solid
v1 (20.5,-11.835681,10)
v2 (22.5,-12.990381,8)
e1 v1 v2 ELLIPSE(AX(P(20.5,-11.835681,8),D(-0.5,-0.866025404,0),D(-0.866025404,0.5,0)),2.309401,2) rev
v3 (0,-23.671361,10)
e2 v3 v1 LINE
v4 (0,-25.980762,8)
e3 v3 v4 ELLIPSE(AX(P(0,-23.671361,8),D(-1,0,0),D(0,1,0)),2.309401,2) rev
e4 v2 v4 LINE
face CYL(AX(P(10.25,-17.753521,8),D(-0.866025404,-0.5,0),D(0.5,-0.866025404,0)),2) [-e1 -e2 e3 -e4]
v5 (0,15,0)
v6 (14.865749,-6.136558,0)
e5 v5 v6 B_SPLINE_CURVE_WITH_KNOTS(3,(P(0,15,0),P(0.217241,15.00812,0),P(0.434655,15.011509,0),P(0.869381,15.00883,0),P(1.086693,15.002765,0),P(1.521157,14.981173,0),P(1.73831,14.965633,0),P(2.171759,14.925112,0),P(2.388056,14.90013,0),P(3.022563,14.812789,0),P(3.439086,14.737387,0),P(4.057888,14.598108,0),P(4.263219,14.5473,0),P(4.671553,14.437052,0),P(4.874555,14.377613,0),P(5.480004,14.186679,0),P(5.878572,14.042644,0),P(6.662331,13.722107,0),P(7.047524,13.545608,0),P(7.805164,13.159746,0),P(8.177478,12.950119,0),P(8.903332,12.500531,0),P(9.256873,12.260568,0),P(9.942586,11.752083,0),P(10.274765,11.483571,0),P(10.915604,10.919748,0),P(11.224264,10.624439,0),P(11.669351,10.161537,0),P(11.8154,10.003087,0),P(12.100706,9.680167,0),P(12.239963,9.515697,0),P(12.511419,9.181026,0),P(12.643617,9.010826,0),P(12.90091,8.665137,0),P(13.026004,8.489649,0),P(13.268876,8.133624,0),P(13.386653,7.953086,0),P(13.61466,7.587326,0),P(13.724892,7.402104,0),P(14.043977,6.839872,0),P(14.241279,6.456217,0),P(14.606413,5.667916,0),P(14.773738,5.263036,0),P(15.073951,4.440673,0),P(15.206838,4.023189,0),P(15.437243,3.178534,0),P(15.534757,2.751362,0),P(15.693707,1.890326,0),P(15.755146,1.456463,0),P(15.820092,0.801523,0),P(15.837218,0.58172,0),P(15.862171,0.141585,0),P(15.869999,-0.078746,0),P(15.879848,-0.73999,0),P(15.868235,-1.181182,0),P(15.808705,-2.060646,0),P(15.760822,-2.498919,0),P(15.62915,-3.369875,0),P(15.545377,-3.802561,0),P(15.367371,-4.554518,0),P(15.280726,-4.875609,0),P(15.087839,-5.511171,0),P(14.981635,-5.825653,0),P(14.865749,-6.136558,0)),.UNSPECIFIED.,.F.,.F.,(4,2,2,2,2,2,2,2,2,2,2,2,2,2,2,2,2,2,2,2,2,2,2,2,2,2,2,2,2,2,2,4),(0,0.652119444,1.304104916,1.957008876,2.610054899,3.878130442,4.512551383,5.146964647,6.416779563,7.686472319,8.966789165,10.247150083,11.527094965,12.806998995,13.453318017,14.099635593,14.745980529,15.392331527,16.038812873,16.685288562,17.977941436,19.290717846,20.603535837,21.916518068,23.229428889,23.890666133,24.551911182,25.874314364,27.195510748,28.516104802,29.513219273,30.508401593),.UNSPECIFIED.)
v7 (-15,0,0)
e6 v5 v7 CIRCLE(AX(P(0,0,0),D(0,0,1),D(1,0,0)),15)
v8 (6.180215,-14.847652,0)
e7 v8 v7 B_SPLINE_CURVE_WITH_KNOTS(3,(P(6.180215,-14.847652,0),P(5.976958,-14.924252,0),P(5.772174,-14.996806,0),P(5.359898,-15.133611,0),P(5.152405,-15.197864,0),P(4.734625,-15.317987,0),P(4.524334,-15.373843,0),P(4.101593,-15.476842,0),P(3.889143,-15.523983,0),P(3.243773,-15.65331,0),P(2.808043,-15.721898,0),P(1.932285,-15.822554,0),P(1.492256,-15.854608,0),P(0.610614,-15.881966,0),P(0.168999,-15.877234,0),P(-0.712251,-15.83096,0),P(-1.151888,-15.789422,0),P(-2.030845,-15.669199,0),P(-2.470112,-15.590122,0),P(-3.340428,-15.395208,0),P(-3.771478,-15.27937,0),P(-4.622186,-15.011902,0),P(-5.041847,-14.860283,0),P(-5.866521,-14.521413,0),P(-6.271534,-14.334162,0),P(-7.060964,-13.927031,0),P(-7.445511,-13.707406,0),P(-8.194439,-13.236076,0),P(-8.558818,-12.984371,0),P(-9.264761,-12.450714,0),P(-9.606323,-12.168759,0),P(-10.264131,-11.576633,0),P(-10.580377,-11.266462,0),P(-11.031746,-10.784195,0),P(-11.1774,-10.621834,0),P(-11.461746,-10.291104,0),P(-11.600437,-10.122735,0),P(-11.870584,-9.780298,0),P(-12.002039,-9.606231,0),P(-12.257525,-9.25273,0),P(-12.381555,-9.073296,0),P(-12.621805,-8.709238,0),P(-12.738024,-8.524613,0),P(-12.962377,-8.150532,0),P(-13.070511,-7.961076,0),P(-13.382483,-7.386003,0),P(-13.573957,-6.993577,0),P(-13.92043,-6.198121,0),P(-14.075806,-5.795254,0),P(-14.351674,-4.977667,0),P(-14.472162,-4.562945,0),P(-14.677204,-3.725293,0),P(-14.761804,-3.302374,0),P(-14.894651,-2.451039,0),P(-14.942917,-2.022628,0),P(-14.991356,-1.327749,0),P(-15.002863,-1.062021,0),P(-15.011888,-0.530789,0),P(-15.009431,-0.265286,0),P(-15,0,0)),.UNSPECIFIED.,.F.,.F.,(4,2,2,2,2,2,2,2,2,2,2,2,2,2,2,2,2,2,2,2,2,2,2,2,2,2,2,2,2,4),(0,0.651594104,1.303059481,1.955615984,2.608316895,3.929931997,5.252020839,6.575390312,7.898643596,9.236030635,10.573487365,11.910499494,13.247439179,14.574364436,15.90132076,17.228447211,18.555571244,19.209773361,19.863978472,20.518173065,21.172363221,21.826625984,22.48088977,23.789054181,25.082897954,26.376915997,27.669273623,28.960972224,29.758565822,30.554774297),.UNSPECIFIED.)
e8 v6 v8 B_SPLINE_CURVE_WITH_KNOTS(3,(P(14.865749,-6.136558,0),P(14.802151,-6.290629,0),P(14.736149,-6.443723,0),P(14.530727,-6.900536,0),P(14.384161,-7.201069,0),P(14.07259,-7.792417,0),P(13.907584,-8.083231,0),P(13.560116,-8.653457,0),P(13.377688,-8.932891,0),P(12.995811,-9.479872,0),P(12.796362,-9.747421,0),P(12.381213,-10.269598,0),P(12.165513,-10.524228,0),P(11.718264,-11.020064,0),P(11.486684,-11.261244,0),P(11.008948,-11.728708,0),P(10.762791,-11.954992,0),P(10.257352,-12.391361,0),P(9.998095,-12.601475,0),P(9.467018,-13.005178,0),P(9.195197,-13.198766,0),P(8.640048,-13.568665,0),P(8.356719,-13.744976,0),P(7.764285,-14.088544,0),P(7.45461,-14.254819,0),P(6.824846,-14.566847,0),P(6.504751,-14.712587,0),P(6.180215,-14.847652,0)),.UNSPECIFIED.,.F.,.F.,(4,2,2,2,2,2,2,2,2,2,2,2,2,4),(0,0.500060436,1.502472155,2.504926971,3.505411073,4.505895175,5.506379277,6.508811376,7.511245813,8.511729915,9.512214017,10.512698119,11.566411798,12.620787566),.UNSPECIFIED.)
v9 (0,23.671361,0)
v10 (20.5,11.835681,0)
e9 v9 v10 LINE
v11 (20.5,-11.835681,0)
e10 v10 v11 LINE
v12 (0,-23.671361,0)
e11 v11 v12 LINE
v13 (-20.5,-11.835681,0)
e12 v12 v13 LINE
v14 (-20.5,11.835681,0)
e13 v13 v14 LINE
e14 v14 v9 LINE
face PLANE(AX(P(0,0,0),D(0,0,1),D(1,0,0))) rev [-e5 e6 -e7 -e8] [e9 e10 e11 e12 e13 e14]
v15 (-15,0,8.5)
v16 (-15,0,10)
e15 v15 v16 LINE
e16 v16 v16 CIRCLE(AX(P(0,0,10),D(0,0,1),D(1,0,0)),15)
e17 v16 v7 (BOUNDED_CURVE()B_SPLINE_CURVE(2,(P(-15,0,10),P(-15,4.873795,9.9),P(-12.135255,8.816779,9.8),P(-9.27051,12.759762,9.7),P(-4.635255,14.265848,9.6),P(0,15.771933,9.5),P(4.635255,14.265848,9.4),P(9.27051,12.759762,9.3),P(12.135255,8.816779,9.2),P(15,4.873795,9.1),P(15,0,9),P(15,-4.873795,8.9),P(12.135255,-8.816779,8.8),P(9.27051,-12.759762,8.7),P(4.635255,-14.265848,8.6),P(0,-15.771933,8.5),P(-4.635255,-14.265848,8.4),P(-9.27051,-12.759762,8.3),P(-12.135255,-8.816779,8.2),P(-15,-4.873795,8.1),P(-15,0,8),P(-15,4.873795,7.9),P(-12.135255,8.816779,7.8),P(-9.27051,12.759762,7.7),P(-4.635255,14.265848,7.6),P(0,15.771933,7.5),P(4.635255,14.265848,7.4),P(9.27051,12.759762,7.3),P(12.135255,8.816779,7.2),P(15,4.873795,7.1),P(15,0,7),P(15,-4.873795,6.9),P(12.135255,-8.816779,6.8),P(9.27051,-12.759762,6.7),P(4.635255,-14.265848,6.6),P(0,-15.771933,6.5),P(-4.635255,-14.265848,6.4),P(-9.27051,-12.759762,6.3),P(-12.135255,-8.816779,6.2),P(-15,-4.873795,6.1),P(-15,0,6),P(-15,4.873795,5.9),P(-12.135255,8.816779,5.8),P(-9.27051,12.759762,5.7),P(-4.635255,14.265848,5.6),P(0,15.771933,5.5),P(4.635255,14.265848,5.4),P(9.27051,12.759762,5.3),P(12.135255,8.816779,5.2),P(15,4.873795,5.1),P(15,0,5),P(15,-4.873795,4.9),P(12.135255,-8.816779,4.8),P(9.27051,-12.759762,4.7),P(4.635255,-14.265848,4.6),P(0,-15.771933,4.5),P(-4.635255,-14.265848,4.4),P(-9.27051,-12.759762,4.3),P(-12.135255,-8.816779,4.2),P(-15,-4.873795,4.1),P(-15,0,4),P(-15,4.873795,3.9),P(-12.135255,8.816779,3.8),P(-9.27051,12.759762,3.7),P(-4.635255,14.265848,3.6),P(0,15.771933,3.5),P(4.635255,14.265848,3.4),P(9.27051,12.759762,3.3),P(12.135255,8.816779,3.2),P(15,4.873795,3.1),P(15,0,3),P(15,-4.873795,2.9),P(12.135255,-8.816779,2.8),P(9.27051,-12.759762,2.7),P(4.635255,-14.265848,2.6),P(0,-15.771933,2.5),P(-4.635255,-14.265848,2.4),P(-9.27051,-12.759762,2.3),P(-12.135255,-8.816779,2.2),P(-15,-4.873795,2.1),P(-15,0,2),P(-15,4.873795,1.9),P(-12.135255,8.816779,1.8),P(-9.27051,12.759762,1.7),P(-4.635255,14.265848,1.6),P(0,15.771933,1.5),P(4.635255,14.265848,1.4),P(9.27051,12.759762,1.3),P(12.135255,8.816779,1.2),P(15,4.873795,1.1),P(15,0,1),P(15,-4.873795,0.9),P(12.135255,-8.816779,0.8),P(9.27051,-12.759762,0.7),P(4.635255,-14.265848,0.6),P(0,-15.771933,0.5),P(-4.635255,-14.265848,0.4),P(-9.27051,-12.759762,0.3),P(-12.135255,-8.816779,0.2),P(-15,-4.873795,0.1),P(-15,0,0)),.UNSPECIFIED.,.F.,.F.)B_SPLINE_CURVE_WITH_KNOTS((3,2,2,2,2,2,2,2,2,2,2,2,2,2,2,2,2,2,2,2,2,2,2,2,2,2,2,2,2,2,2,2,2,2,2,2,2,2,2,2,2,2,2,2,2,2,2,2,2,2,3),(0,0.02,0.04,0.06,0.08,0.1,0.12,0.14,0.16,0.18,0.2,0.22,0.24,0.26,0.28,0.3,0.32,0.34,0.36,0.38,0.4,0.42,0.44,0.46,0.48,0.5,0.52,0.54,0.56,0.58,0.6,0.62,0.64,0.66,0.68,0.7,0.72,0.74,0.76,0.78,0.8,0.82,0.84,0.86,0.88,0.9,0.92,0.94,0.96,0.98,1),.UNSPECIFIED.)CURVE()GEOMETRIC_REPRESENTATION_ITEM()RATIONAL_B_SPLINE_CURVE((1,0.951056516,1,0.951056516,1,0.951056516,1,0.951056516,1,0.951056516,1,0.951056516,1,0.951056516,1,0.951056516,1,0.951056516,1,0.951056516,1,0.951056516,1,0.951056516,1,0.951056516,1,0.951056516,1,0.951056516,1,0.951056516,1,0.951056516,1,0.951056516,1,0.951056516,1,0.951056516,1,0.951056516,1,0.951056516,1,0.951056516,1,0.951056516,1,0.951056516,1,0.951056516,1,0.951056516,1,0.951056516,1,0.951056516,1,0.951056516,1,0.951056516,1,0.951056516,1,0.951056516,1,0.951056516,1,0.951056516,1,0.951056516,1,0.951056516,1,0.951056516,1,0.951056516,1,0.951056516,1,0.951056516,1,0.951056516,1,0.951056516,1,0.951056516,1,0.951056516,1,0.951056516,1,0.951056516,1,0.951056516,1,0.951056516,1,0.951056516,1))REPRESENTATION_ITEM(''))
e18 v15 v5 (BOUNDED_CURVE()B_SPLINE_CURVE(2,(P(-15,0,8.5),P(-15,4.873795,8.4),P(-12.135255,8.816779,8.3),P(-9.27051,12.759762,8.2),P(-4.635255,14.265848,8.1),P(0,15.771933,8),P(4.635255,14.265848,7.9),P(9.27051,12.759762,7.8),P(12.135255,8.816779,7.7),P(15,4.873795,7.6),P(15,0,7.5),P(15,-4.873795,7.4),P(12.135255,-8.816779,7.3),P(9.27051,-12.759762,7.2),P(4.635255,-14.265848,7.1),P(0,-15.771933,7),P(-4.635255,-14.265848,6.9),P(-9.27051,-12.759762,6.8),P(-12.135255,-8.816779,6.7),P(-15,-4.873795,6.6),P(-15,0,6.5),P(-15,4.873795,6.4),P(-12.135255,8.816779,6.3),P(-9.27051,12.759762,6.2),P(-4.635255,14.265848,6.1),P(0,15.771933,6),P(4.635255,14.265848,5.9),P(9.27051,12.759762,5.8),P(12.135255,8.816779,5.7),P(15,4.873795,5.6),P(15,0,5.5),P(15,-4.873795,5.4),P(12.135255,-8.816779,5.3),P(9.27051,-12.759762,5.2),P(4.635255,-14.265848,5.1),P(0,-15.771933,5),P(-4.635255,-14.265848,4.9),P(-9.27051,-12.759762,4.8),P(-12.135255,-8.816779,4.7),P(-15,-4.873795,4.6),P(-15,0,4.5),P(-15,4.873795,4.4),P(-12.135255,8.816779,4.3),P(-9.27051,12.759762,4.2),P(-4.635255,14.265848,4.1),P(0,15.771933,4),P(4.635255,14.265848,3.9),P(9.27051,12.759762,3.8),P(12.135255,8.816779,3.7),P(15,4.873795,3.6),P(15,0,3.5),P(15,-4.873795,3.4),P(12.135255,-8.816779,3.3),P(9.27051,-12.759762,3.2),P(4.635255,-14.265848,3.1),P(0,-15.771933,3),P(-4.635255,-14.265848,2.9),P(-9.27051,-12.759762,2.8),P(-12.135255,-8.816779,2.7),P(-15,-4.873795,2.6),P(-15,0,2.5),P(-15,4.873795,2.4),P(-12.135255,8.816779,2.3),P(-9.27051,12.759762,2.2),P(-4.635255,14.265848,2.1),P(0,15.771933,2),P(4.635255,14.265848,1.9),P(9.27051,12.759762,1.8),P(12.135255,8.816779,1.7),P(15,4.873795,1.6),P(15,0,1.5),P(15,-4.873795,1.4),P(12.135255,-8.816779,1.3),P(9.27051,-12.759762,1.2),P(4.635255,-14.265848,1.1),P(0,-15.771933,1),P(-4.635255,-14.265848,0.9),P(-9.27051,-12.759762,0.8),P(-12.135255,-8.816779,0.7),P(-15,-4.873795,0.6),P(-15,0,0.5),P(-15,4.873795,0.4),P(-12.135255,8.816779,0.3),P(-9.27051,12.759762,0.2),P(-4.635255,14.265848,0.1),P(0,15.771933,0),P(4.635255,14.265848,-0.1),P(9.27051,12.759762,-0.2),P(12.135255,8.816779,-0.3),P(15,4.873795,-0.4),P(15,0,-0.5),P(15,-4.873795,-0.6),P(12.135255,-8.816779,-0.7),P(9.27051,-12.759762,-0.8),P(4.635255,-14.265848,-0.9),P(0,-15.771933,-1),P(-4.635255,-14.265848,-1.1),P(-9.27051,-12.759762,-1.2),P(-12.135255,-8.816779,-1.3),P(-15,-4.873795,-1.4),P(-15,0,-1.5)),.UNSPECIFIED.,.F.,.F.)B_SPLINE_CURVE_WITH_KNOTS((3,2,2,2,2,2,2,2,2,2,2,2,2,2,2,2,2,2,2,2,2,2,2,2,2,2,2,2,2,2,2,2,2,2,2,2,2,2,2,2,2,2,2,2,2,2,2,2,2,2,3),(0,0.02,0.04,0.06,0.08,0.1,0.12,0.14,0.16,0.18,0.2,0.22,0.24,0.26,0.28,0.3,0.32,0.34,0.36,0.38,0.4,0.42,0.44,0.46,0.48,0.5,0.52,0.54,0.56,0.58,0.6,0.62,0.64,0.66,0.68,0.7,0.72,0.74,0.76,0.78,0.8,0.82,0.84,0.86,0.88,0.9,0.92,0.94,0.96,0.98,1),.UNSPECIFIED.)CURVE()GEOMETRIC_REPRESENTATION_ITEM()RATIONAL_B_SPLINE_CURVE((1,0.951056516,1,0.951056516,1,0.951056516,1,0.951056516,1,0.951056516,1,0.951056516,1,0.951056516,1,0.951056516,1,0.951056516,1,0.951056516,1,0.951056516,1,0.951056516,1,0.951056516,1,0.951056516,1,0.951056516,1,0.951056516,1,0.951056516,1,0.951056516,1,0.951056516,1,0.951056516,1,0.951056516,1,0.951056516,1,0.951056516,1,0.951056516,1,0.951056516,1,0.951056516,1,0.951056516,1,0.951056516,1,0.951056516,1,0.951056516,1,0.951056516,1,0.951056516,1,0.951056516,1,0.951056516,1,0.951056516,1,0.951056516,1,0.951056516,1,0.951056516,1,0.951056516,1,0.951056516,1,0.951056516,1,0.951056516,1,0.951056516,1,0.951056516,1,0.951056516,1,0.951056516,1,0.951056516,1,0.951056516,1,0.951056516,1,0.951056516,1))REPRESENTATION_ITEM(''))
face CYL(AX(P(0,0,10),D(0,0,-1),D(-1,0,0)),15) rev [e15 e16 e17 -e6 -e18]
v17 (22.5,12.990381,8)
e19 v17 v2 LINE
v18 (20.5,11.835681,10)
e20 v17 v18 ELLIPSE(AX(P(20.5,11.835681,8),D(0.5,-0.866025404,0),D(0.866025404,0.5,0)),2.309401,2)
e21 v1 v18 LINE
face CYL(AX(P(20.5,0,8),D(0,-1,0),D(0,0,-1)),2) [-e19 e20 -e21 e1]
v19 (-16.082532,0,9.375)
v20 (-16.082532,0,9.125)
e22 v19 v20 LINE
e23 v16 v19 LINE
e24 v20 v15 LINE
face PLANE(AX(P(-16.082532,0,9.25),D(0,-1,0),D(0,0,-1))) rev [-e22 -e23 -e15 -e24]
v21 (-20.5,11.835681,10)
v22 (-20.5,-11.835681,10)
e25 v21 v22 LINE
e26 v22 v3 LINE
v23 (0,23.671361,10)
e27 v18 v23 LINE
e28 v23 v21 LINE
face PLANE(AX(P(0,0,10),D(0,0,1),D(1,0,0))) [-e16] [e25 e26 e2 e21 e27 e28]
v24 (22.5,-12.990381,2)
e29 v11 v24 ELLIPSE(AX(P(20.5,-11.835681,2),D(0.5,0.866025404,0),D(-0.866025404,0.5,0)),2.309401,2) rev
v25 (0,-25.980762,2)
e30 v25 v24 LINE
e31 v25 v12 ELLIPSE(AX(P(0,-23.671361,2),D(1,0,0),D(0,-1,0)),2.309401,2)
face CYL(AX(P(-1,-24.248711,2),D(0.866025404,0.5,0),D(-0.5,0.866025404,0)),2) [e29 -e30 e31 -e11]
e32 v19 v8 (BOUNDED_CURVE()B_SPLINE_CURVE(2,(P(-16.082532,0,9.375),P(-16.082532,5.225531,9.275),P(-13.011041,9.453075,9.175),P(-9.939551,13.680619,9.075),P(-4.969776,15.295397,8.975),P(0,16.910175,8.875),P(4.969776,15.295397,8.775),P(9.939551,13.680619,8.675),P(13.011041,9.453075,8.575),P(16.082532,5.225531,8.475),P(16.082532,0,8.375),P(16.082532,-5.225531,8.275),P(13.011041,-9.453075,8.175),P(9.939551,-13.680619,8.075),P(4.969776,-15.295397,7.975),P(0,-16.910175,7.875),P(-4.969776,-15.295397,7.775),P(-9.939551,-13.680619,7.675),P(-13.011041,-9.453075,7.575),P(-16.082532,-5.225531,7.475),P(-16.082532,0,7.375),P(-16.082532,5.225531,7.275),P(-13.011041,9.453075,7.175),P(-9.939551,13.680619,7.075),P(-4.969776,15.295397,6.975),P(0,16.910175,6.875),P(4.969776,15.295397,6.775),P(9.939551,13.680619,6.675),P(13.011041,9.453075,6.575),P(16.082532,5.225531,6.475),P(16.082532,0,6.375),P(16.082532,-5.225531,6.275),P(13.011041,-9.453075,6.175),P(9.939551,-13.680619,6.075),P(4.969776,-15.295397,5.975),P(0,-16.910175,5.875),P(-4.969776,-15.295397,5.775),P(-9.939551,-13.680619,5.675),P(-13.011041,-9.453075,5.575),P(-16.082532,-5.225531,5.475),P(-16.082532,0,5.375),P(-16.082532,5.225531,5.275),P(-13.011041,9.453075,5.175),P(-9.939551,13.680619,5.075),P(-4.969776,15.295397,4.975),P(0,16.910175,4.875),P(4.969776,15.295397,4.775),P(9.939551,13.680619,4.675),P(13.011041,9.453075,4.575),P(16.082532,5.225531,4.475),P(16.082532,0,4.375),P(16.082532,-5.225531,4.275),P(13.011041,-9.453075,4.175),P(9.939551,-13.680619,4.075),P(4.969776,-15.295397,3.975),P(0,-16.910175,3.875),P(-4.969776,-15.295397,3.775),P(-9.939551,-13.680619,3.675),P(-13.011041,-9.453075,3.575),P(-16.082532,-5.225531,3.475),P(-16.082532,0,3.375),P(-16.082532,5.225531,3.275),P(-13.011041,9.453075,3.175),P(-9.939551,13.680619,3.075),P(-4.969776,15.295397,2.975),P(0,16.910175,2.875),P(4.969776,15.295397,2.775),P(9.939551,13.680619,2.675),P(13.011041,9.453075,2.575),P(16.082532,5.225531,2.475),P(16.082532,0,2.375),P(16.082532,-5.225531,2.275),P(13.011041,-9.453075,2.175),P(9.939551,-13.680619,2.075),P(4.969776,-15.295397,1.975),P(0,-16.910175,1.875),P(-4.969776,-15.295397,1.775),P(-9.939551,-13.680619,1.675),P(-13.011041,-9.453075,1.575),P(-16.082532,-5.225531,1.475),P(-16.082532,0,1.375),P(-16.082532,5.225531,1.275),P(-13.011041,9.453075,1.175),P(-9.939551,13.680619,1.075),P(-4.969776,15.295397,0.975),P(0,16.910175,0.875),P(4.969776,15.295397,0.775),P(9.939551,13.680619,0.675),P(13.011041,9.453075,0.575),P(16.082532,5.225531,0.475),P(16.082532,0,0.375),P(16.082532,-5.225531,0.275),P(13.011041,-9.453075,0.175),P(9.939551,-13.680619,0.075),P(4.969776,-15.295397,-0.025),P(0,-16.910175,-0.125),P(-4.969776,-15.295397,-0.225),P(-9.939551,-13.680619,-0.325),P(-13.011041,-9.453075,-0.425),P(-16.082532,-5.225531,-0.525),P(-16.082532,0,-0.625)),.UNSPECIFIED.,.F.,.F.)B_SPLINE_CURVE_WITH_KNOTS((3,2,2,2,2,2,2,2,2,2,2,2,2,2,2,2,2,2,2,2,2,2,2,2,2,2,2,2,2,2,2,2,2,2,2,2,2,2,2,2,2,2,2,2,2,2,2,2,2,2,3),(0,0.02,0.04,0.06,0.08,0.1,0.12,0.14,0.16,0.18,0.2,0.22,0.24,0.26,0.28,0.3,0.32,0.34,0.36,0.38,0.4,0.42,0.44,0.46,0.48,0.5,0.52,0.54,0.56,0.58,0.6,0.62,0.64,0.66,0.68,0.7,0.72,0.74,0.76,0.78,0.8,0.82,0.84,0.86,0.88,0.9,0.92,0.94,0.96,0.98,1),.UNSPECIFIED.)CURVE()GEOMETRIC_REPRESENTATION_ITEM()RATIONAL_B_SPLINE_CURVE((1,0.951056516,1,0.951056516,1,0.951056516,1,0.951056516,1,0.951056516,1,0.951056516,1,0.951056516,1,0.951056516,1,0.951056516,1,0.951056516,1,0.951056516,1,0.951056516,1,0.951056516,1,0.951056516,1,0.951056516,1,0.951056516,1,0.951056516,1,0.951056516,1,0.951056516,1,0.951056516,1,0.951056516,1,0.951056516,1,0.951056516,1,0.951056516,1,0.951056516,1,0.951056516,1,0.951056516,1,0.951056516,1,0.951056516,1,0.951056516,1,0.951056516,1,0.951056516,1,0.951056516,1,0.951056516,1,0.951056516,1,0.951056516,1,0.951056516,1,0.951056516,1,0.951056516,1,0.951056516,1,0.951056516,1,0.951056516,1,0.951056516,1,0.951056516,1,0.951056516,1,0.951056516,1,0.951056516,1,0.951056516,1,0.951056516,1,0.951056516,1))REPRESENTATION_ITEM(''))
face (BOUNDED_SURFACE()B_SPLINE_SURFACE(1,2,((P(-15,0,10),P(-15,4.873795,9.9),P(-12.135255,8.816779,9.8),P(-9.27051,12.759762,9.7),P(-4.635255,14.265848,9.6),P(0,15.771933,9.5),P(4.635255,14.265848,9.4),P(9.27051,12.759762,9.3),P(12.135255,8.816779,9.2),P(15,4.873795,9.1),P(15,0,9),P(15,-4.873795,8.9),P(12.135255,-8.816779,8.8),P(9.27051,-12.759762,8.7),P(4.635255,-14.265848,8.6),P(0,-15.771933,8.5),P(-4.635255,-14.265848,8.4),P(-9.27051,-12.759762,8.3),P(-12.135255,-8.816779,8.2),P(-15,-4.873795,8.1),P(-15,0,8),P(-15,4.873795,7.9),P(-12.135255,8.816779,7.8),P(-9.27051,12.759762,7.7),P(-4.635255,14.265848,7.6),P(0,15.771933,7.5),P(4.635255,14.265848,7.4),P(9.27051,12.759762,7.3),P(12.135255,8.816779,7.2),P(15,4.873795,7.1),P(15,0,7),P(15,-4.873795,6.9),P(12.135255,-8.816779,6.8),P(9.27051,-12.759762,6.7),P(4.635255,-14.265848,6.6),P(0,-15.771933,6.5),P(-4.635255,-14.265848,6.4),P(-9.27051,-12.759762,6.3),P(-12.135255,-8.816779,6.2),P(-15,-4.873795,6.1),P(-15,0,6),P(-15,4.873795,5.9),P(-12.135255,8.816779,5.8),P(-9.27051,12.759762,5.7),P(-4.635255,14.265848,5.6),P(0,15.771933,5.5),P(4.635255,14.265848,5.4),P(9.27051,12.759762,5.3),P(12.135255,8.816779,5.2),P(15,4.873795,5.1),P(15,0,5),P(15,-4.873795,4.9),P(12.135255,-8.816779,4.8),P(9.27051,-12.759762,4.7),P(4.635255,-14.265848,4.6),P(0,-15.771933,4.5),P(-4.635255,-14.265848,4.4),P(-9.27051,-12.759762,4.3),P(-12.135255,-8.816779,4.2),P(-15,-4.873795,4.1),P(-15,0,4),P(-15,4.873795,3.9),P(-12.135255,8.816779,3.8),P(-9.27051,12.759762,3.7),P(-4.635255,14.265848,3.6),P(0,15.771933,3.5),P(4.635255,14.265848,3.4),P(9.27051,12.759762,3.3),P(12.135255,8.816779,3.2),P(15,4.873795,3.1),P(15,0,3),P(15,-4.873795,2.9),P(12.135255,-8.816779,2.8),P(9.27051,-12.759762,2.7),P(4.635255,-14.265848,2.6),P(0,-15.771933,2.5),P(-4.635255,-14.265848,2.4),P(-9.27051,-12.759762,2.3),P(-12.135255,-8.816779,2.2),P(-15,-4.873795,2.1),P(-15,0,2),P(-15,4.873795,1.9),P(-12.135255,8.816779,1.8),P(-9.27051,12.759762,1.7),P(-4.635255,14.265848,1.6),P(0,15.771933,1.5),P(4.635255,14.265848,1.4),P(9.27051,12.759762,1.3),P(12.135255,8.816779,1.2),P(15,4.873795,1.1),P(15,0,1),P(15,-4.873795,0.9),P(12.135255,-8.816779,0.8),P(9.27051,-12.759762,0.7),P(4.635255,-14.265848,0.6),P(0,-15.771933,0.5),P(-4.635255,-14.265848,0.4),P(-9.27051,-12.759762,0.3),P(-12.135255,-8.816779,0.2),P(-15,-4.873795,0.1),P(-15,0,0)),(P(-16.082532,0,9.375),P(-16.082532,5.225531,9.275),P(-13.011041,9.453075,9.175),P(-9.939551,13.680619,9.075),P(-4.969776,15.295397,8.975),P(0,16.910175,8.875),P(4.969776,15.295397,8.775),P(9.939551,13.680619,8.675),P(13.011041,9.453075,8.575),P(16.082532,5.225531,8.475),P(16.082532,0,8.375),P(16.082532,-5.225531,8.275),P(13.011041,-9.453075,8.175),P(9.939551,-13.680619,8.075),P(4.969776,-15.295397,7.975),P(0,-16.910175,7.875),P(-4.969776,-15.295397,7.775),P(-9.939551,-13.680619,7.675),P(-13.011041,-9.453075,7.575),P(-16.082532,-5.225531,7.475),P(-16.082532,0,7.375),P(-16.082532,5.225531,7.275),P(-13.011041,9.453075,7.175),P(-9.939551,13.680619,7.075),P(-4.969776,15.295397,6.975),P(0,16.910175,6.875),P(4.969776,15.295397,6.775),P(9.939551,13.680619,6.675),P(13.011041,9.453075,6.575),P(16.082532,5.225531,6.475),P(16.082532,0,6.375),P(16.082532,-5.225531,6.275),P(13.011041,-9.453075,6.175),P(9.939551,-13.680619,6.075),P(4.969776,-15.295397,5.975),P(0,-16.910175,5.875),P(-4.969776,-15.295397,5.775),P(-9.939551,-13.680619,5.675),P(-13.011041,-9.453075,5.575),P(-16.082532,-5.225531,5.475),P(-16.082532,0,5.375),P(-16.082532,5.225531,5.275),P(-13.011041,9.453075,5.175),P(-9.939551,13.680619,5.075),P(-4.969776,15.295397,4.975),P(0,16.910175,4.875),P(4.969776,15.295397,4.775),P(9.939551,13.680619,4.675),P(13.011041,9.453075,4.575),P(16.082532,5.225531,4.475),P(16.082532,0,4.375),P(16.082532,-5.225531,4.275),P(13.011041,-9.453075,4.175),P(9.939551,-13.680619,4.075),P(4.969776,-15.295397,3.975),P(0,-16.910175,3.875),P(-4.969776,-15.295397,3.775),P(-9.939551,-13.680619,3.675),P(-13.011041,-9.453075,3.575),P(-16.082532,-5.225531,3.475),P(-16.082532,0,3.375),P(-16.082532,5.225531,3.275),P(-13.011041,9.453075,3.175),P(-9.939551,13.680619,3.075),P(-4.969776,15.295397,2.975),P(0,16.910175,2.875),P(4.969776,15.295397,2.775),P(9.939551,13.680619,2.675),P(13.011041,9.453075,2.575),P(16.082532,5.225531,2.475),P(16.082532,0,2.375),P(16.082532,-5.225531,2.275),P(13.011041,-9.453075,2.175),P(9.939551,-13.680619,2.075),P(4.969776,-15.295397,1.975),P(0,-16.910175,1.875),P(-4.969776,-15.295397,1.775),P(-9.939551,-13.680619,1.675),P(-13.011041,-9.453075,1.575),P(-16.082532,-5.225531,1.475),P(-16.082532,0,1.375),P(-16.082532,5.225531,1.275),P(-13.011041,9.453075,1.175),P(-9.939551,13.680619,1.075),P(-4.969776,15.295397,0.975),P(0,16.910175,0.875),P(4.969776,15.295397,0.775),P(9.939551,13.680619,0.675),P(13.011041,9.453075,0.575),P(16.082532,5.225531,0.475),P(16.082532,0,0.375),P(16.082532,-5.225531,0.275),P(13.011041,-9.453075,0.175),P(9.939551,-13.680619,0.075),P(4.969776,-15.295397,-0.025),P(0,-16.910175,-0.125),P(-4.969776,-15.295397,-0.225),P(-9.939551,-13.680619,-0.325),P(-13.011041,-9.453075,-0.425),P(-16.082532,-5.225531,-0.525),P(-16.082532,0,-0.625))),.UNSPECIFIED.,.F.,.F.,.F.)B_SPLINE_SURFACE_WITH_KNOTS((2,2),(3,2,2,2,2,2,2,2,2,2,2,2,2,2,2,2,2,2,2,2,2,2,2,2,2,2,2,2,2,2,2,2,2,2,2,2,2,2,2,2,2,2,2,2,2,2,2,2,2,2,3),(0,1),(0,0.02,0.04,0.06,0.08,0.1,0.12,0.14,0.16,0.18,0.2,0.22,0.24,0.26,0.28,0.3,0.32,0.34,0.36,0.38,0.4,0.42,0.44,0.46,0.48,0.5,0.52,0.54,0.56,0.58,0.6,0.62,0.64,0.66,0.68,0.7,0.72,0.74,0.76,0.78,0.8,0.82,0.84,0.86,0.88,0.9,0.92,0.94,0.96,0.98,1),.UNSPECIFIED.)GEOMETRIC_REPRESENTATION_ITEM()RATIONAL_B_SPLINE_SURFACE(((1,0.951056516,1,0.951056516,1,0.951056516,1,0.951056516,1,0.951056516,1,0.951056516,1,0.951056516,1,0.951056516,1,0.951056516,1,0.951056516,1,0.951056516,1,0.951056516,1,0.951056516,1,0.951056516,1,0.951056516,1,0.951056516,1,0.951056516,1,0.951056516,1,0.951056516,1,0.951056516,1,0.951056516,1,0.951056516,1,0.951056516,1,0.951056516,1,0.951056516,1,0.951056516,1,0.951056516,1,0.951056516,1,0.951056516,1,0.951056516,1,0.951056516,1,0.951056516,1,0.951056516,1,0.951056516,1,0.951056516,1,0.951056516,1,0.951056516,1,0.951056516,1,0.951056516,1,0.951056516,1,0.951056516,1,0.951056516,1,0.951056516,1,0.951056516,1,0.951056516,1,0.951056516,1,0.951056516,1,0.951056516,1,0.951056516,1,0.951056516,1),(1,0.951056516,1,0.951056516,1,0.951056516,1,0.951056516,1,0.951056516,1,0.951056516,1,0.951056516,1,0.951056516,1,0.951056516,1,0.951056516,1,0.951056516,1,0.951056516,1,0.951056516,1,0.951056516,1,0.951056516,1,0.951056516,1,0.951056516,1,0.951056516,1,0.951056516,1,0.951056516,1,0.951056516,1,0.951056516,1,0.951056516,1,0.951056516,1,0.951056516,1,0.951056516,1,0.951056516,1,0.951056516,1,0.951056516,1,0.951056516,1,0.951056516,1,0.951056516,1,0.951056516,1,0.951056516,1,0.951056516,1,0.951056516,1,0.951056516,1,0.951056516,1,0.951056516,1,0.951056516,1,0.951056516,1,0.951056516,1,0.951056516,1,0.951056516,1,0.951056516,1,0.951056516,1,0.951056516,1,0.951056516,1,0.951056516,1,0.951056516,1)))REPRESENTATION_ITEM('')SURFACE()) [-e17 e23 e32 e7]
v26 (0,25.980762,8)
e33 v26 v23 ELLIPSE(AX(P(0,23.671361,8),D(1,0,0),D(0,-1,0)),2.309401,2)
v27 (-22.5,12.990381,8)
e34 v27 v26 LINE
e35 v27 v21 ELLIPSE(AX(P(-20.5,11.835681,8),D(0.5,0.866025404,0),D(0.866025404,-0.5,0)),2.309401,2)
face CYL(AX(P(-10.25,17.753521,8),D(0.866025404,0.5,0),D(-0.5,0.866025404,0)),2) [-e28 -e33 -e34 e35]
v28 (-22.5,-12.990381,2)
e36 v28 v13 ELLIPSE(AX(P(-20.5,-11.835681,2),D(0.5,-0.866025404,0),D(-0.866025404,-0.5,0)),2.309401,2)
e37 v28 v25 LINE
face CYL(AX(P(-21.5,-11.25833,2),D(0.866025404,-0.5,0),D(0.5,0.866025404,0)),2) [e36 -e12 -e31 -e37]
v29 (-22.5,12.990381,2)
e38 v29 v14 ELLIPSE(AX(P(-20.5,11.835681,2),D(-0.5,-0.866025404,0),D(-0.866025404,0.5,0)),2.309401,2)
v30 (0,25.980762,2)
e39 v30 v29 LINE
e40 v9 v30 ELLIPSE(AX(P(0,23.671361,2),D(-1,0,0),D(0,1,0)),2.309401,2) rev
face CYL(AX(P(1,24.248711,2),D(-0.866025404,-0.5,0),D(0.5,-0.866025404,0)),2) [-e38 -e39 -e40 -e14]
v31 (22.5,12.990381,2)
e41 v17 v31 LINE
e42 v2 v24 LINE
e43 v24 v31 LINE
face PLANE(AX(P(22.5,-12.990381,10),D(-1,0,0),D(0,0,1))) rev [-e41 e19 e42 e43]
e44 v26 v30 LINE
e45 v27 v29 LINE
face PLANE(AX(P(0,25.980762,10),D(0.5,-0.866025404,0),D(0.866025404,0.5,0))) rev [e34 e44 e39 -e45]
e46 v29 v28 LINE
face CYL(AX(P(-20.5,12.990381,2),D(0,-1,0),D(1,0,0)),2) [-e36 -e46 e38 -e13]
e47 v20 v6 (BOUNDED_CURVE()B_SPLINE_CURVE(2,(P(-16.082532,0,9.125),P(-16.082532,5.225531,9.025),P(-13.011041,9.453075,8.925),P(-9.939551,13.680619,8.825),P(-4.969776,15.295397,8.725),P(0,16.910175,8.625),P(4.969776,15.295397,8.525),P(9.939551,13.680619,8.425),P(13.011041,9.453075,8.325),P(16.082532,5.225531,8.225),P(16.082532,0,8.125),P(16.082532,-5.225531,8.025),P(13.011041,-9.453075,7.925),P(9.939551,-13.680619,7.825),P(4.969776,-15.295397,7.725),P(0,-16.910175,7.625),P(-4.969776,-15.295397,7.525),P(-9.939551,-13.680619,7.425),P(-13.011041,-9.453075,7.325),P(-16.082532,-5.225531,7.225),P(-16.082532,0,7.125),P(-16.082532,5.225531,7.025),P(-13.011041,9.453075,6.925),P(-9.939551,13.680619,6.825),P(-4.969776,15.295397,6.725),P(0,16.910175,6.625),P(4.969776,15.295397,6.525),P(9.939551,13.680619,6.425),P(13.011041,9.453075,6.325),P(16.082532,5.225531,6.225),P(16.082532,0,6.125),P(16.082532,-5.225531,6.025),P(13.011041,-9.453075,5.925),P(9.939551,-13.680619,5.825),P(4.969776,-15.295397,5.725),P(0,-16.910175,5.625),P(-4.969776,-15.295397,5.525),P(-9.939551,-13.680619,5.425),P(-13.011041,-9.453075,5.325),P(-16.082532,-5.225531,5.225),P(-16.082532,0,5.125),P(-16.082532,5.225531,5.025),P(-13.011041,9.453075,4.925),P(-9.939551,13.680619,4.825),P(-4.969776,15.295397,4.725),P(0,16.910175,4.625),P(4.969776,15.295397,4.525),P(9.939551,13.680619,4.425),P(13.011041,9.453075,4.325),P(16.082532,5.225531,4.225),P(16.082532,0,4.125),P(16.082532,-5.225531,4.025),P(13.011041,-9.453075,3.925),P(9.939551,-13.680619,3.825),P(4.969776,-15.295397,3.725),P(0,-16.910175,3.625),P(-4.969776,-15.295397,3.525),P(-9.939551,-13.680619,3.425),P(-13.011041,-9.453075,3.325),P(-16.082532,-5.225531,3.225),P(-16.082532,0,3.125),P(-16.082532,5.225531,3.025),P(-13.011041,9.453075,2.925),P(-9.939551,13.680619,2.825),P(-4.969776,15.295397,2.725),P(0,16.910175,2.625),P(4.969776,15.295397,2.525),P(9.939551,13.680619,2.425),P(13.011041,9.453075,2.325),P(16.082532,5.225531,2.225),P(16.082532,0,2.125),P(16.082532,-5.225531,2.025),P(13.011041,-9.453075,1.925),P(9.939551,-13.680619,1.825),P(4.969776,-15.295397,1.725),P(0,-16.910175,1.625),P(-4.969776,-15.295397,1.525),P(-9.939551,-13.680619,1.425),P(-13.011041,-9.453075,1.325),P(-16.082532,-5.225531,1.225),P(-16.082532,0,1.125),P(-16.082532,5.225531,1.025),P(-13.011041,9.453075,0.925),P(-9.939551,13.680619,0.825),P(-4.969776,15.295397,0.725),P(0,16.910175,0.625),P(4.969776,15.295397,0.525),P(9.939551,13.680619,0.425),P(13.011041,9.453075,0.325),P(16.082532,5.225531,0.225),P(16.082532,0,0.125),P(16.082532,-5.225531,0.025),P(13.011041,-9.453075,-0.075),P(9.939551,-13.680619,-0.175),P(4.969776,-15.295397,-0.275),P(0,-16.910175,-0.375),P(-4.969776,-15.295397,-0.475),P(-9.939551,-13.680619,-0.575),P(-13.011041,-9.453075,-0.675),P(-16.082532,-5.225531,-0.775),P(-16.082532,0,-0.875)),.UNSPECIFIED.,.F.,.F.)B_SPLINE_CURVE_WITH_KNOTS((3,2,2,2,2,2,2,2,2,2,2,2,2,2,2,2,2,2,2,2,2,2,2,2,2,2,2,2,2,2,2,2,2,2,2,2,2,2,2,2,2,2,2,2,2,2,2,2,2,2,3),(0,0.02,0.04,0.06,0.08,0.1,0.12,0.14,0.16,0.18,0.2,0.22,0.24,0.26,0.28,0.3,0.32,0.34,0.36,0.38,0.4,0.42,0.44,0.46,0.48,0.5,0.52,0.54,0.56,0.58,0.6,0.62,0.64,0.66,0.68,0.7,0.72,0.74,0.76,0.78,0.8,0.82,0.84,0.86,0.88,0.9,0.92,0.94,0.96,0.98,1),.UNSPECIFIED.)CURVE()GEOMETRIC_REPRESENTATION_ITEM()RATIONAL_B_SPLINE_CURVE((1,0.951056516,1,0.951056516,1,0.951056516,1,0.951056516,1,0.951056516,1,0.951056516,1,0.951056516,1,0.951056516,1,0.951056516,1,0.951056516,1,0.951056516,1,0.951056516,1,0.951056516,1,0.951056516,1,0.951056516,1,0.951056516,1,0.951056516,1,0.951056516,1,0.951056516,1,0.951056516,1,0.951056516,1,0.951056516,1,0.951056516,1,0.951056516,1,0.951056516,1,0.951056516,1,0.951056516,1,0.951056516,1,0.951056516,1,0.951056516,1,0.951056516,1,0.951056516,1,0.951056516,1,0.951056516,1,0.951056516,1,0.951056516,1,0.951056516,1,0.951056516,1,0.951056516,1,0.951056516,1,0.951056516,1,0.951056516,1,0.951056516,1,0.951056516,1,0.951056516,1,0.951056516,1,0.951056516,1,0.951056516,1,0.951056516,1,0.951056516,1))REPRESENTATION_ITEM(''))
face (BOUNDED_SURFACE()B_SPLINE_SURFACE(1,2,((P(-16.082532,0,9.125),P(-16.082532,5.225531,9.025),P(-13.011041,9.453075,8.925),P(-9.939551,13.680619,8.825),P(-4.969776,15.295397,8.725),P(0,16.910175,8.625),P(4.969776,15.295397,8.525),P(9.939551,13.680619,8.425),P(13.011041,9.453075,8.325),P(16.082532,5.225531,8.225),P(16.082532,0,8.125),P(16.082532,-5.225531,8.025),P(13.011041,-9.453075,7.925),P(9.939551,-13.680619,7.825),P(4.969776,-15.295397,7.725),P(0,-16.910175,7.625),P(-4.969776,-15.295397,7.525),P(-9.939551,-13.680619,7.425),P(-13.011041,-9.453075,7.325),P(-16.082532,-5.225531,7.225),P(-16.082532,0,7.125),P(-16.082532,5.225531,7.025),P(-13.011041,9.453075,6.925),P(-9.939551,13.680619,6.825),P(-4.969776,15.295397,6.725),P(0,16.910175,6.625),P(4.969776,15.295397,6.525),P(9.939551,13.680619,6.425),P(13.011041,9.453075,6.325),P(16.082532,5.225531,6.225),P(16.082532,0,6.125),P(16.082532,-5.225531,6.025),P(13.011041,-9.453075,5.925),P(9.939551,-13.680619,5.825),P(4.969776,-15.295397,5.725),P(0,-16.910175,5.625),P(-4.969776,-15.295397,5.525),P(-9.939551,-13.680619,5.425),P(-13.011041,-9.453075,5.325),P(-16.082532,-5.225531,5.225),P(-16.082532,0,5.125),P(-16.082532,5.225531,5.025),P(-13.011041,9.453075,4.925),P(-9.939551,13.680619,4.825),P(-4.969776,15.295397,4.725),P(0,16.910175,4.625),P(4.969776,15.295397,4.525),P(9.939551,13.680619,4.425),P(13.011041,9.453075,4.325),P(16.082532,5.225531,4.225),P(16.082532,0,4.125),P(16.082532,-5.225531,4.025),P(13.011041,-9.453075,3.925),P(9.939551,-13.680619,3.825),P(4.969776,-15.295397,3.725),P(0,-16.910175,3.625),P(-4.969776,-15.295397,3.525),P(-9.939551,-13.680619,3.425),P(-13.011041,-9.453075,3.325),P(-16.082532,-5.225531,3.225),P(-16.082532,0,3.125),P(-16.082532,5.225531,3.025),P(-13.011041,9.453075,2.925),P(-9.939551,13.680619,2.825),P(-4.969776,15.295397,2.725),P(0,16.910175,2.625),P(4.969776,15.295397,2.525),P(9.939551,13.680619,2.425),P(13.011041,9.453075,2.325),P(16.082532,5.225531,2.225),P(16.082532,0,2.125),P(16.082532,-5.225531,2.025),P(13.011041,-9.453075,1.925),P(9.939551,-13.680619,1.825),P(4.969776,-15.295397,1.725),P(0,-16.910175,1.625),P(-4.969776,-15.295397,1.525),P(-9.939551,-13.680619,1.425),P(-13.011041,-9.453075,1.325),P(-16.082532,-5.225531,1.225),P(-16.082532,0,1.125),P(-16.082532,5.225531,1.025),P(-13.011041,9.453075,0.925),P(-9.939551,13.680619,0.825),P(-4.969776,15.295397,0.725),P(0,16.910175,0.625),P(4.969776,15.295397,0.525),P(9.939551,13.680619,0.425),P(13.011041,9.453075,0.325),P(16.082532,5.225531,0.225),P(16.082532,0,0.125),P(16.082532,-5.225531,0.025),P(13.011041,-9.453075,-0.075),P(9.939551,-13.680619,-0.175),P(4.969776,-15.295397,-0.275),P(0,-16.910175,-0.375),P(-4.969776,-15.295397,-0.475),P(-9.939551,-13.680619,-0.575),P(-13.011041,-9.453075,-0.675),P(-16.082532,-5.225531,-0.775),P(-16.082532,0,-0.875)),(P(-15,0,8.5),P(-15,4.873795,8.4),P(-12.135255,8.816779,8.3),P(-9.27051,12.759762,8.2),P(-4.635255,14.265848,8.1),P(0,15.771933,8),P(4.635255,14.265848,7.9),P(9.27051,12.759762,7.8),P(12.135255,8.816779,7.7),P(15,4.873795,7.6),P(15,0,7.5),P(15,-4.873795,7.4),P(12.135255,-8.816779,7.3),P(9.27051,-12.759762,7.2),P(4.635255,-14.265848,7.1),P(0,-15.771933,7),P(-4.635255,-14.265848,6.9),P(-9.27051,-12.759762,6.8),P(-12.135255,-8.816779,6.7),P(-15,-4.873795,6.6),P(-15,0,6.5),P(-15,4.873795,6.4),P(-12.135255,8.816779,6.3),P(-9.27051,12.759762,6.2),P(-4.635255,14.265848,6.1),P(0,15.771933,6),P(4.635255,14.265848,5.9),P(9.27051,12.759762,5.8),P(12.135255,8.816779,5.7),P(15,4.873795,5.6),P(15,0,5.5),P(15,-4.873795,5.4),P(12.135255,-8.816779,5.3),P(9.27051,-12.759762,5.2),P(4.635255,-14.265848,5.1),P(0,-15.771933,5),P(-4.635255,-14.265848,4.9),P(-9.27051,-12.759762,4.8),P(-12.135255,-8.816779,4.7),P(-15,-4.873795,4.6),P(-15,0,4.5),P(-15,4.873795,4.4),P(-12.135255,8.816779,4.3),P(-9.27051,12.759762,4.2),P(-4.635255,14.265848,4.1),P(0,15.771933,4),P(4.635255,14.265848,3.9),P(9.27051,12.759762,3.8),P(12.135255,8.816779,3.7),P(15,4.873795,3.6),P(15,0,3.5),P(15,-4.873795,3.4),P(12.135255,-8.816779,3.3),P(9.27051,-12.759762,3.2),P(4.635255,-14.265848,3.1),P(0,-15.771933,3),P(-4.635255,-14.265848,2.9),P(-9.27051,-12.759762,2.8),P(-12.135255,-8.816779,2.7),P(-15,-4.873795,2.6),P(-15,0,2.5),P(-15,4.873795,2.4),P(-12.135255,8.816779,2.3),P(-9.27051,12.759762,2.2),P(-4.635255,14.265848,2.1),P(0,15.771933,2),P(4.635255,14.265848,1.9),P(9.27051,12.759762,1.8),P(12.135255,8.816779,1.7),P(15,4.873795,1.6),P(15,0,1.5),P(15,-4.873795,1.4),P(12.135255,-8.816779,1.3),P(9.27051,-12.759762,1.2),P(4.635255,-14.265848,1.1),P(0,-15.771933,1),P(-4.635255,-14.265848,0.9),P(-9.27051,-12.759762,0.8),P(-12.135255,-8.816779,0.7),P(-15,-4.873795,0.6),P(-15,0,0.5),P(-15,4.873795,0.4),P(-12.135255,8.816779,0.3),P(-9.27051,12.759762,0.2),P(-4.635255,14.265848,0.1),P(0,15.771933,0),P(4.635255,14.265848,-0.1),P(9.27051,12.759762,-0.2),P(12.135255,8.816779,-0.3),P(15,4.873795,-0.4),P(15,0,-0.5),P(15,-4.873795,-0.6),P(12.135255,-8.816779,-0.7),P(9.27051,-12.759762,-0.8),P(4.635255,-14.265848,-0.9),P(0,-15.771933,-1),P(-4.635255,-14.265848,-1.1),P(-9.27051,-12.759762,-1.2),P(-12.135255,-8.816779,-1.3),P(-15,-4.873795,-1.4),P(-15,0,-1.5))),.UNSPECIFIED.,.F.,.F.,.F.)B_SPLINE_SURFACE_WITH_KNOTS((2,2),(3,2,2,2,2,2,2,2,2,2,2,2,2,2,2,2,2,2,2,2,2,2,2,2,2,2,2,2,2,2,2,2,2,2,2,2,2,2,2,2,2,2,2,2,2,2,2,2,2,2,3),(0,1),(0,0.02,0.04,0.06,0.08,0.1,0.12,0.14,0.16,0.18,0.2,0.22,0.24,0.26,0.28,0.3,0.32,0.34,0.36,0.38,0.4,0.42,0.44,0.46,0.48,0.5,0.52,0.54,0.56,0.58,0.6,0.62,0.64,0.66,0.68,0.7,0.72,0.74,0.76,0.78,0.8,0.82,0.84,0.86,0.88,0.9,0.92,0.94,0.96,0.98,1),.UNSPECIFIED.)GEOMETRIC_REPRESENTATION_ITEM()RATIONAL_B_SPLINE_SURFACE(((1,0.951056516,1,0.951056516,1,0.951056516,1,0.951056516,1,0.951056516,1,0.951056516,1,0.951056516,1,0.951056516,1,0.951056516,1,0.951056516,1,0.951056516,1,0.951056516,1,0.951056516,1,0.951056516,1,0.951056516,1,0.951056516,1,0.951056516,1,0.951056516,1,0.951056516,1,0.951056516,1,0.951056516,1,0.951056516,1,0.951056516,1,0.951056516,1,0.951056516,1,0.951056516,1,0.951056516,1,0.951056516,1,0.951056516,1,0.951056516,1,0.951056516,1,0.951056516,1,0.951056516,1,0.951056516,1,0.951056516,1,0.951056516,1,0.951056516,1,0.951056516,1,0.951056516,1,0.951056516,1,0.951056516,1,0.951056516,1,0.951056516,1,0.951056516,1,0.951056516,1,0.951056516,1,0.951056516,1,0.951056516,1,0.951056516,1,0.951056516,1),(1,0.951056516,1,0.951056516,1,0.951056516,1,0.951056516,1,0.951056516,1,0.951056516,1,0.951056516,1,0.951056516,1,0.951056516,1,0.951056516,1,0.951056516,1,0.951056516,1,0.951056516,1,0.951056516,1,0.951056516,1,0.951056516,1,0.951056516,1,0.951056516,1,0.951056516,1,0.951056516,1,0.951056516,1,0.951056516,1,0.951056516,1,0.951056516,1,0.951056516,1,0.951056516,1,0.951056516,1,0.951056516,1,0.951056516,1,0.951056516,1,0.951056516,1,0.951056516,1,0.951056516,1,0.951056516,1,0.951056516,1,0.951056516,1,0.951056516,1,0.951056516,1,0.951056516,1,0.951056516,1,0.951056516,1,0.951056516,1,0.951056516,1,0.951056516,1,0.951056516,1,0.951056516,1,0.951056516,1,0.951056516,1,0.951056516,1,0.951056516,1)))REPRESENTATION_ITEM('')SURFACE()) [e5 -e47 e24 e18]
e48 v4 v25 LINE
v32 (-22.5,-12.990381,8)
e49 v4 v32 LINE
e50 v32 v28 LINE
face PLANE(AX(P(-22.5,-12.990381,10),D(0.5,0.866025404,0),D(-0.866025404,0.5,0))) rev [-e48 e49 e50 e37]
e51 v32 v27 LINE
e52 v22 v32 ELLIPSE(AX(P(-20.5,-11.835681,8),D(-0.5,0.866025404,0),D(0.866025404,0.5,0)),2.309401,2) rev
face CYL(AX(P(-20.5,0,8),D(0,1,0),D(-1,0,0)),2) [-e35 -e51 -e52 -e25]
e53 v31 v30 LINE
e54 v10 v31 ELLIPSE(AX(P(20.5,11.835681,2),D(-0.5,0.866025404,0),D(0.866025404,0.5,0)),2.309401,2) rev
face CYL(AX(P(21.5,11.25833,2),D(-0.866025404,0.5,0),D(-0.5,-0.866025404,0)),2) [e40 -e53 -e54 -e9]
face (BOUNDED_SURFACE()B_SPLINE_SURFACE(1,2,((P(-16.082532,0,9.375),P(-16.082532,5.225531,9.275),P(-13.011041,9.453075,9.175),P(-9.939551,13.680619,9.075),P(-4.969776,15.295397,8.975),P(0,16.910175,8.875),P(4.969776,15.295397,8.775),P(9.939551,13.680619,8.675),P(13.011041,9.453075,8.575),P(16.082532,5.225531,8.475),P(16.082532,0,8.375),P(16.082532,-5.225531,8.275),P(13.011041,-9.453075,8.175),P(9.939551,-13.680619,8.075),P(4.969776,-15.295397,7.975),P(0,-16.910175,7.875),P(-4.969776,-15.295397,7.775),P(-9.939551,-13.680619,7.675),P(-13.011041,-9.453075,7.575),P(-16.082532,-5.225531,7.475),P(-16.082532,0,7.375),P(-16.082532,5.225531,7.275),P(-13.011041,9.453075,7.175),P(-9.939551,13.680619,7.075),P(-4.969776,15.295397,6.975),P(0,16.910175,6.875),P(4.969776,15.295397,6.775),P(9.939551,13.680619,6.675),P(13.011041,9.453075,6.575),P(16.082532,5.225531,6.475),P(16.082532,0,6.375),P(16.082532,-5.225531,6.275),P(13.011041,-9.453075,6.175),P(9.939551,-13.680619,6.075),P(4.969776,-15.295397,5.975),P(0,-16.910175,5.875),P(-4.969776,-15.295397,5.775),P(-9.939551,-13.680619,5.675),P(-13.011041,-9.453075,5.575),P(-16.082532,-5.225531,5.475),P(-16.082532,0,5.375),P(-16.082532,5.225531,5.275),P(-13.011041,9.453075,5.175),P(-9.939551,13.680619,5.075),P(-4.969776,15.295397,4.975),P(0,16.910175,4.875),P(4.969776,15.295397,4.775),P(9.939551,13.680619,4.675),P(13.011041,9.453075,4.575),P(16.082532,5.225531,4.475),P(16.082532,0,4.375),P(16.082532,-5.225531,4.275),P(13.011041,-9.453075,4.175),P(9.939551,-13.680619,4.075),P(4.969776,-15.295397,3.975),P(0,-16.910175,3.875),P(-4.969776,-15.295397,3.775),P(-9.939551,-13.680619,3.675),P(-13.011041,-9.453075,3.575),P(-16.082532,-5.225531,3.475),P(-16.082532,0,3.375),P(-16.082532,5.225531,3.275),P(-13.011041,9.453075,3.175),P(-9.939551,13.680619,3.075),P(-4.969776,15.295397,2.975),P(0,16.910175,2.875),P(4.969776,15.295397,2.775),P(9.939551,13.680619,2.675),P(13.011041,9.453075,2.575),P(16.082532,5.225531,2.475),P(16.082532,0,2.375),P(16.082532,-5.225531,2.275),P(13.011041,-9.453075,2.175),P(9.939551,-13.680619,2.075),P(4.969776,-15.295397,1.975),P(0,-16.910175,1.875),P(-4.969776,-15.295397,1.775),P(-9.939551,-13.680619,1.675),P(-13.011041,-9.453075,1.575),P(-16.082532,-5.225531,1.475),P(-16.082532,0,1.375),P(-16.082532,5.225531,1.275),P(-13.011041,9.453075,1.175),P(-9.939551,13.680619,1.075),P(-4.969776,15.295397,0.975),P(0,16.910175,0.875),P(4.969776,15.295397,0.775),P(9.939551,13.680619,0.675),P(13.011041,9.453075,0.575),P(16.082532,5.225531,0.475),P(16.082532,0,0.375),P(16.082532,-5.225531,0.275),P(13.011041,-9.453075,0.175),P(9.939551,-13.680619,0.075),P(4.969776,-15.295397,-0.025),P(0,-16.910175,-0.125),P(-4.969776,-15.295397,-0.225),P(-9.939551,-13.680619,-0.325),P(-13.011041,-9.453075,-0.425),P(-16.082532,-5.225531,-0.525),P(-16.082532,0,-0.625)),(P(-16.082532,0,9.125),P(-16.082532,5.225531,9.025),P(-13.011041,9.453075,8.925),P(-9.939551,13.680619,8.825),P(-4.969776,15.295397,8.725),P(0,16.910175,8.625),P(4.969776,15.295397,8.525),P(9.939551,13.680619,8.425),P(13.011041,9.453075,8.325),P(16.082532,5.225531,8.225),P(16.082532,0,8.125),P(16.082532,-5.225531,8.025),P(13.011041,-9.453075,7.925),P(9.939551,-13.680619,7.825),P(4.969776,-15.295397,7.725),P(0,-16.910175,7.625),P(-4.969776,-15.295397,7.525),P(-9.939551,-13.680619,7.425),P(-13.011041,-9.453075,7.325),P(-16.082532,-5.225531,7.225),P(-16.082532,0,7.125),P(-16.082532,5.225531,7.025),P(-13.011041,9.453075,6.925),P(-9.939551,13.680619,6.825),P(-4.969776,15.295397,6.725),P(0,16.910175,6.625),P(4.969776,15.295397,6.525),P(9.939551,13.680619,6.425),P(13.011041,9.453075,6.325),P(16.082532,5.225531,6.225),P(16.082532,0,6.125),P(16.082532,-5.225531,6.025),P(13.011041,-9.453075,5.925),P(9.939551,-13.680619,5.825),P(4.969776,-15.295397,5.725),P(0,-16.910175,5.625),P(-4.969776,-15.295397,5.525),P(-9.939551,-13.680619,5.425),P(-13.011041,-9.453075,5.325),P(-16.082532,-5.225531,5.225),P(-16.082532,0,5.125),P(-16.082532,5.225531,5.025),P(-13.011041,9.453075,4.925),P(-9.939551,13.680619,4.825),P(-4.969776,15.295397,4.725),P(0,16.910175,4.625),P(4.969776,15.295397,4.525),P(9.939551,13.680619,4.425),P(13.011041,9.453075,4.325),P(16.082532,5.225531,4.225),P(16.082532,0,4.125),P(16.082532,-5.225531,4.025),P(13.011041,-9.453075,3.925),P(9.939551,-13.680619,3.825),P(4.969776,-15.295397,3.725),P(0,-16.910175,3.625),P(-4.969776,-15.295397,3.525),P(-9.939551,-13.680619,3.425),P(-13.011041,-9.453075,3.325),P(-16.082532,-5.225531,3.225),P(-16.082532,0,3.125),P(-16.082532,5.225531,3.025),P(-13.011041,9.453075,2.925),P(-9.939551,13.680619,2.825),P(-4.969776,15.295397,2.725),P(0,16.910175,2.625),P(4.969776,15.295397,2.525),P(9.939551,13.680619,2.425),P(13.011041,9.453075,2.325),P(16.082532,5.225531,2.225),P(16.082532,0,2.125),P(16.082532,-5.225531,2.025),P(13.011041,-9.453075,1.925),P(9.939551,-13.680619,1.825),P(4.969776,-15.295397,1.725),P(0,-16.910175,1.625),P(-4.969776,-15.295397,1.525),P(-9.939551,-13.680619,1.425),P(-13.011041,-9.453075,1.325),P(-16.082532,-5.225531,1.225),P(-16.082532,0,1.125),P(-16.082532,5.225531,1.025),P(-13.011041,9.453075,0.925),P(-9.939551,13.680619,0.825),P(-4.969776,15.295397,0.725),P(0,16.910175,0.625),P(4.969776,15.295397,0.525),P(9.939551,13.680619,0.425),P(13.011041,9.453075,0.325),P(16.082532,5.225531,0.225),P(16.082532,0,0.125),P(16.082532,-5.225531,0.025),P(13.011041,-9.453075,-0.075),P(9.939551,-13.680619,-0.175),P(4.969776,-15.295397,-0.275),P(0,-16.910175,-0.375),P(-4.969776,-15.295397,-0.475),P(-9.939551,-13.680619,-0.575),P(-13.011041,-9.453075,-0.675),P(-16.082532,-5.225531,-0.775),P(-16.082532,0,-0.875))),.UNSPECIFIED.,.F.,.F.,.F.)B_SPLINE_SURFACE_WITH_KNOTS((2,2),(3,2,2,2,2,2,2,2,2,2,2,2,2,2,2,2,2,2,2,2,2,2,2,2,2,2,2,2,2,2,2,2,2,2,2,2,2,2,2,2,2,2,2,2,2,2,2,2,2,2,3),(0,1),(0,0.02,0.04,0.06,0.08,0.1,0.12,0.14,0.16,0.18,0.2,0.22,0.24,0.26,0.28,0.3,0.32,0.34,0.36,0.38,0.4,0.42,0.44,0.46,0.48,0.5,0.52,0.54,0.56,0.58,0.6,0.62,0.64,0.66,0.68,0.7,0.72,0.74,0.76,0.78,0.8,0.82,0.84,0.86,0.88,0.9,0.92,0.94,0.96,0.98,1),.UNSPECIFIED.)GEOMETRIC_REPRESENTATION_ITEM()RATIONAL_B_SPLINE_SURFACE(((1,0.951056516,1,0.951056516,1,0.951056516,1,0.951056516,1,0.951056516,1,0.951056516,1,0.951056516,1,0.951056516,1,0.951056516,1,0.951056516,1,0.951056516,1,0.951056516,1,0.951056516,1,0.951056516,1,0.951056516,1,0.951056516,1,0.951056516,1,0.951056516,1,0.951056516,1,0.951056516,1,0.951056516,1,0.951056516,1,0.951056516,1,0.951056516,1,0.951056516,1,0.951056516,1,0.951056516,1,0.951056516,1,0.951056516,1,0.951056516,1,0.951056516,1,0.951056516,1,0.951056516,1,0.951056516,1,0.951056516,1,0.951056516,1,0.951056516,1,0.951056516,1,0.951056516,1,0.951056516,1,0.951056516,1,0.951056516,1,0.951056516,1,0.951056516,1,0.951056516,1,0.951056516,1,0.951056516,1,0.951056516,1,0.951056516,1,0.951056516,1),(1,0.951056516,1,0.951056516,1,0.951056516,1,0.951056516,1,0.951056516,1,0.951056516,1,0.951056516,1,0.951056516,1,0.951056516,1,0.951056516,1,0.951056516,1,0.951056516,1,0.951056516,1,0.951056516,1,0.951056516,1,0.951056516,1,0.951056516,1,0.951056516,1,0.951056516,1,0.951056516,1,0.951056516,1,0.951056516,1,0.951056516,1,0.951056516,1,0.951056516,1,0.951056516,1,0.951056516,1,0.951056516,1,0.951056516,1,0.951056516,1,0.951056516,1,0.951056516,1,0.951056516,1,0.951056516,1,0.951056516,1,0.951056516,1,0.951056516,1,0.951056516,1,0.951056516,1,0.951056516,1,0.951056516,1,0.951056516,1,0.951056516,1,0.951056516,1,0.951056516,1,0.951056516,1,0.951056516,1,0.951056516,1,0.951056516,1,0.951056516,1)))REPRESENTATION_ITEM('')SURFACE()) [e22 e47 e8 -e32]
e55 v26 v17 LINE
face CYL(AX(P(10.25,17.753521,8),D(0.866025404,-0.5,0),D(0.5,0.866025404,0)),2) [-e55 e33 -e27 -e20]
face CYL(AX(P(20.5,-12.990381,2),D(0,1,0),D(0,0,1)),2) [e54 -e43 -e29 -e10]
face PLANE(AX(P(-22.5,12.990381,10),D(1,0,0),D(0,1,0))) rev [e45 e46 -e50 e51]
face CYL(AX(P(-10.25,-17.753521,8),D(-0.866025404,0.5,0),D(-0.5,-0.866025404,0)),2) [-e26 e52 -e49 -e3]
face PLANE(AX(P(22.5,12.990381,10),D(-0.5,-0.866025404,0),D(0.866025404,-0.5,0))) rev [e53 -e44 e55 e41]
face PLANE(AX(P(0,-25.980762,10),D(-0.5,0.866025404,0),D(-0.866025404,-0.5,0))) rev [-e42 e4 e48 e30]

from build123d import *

# Parameters (mm, degrees)
IZIM1_R                     = 15
Y_KSEKLIK_EKSTR_ZYON1_DEPTH = 10
DI_2_PITCH                  = 2
RADYUS1_R                   = 2
RADYUS3_R                   = 2


with BuildPart() as part:
    # Çizim1 → Yükseklik-Ekstrüzyon1 (new body)
    with BuildSketch(Plane.XY):
        Polygon((0, 25.980762114), (-22.5, 12.990381057), (-22.5, -12.990381057), (0, -25.980762114), (22.5, -12.990381057), (22.5, 12.990381057), align=None)
        Circle(IZIM1_R, mode=Mode.SUBTRACT)
    extrude(amount=Y_KSEKLIK_EKSTR_ZYON1_DEPTH)

    # Diş2: the profile of Diş Profili2 profile screwed along a right-hand helix of 5 turns, 10 arcs to a turn; built about Z, then put on its axis
    di_2_z = Axis((0, 0, 0), (0, 0, 1))
    di_2_corners = [(14.9997, 0, -0.000173205), (16.08253175, 0, 0.624999997), (16.08253175, 0, 0.874999997), (14.9997, 0, 1.5001732)]
    with BuildLine(mode=Mode.PRIVATE) as di_2_profile:
        Line(di_2_corners[0], di_2_corners[1])
        Line(di_2_corners[1], di_2_corners[2])
        Line(di_2_corners[2], di_2_corners[3])
        Line(di_2_corners[3], di_2_corners[0])
    di_2_cap = Face(di_2_profile.wire())
    di_2_turn_angles = [0, 18, 36, 54, 72, 90, 108, 126, 144, 162, 180, 198, 216, 234, 252, 270, 288, 306, 324, 342, 360]
    di_2_turn_weights = [1, 0.9510565162951535, 1, 0.9510565162951535, 1, 0.9510565162951535, 1, 0.9510565162951535, 1, 0.9510565162951535, 1, 0.9510565162951535, 1, 0.9510565162951535, 1, 0.9510565162951535, 1, 0.9510565162951535, 1, 0.9510565162951535, 1]
    di_2_turn_rails = [Edge.make_bspline([Vector(p[0], p[1], 0).rotate(di_2_z, di_2_turn_angles[k]) / di_2_turn_weights[k] + Vector(0, 0, p[2] + DI_2_PITCH * di_2_turn_angles[k] / 360) for k in range(21)], [0, 0, 0, 1, 1, 2, 2, 3, 3, 4, 4, 5, 5, 6, 6, 7, 7, 8, 8, 9, 9, 10, 10, 10], 2, di_2_turn_weights) for p in di_2_corners]
    di_2_turn_sides = [Face.make_surface_from_curves(di_2_turn_rails[p[0]], di_2_turn_rails[p[1]]) for p in [(0, 1), (1, 2), (2, 3), (3, 0)]]
    di_2 = Plane(origin=(0, 0, 10), x_dir=(-1, 0, 0), z_dir=(0, 0, -1)) * Solid(Shell([*[p.moved(Location((0, 0, DI_2_PITCH * i))) for i in range(5) for p in di_2_turn_sides], di_2_cap, di_2_cap.rotate(di_2_z, 1800).moved(Location((0, 0, DI_2_PITCH * 1800 / 360)))]))
    add(di_2, mode=Mode.SUBTRACT)

    # Radyus1
    radyus1_edges = [part.edges().sort_by_distance(p)[0] for p in [
        (-22.5, 0, 10),
        (-11.25, -19.485571585, 10),
        (11.25, -19.485571585, 10),
        (22.5, 0, 10),
        (11.25, 19.485571585, 10),
        (-11.25, 19.485571585, 10),
    ]]
    fillet(radyus1_edges, radius=RADYUS1_R)

    # Radyus3
    radyus3_edges = [part.edges().sort_by_distance(p)[0] for p in [
        (22.5, 0, 0),
        (11.25, -19.485571585, 0),
        (-11.25, -19.485571585, 0),
        (-22.5, 0, 0),
        (-11.25, 19.485571585, 0),
        (11.25, 19.485571585, 0),
    ]]
    fillet(radyus3_edges, radius=RADYUS3_R)


solid = part.part
